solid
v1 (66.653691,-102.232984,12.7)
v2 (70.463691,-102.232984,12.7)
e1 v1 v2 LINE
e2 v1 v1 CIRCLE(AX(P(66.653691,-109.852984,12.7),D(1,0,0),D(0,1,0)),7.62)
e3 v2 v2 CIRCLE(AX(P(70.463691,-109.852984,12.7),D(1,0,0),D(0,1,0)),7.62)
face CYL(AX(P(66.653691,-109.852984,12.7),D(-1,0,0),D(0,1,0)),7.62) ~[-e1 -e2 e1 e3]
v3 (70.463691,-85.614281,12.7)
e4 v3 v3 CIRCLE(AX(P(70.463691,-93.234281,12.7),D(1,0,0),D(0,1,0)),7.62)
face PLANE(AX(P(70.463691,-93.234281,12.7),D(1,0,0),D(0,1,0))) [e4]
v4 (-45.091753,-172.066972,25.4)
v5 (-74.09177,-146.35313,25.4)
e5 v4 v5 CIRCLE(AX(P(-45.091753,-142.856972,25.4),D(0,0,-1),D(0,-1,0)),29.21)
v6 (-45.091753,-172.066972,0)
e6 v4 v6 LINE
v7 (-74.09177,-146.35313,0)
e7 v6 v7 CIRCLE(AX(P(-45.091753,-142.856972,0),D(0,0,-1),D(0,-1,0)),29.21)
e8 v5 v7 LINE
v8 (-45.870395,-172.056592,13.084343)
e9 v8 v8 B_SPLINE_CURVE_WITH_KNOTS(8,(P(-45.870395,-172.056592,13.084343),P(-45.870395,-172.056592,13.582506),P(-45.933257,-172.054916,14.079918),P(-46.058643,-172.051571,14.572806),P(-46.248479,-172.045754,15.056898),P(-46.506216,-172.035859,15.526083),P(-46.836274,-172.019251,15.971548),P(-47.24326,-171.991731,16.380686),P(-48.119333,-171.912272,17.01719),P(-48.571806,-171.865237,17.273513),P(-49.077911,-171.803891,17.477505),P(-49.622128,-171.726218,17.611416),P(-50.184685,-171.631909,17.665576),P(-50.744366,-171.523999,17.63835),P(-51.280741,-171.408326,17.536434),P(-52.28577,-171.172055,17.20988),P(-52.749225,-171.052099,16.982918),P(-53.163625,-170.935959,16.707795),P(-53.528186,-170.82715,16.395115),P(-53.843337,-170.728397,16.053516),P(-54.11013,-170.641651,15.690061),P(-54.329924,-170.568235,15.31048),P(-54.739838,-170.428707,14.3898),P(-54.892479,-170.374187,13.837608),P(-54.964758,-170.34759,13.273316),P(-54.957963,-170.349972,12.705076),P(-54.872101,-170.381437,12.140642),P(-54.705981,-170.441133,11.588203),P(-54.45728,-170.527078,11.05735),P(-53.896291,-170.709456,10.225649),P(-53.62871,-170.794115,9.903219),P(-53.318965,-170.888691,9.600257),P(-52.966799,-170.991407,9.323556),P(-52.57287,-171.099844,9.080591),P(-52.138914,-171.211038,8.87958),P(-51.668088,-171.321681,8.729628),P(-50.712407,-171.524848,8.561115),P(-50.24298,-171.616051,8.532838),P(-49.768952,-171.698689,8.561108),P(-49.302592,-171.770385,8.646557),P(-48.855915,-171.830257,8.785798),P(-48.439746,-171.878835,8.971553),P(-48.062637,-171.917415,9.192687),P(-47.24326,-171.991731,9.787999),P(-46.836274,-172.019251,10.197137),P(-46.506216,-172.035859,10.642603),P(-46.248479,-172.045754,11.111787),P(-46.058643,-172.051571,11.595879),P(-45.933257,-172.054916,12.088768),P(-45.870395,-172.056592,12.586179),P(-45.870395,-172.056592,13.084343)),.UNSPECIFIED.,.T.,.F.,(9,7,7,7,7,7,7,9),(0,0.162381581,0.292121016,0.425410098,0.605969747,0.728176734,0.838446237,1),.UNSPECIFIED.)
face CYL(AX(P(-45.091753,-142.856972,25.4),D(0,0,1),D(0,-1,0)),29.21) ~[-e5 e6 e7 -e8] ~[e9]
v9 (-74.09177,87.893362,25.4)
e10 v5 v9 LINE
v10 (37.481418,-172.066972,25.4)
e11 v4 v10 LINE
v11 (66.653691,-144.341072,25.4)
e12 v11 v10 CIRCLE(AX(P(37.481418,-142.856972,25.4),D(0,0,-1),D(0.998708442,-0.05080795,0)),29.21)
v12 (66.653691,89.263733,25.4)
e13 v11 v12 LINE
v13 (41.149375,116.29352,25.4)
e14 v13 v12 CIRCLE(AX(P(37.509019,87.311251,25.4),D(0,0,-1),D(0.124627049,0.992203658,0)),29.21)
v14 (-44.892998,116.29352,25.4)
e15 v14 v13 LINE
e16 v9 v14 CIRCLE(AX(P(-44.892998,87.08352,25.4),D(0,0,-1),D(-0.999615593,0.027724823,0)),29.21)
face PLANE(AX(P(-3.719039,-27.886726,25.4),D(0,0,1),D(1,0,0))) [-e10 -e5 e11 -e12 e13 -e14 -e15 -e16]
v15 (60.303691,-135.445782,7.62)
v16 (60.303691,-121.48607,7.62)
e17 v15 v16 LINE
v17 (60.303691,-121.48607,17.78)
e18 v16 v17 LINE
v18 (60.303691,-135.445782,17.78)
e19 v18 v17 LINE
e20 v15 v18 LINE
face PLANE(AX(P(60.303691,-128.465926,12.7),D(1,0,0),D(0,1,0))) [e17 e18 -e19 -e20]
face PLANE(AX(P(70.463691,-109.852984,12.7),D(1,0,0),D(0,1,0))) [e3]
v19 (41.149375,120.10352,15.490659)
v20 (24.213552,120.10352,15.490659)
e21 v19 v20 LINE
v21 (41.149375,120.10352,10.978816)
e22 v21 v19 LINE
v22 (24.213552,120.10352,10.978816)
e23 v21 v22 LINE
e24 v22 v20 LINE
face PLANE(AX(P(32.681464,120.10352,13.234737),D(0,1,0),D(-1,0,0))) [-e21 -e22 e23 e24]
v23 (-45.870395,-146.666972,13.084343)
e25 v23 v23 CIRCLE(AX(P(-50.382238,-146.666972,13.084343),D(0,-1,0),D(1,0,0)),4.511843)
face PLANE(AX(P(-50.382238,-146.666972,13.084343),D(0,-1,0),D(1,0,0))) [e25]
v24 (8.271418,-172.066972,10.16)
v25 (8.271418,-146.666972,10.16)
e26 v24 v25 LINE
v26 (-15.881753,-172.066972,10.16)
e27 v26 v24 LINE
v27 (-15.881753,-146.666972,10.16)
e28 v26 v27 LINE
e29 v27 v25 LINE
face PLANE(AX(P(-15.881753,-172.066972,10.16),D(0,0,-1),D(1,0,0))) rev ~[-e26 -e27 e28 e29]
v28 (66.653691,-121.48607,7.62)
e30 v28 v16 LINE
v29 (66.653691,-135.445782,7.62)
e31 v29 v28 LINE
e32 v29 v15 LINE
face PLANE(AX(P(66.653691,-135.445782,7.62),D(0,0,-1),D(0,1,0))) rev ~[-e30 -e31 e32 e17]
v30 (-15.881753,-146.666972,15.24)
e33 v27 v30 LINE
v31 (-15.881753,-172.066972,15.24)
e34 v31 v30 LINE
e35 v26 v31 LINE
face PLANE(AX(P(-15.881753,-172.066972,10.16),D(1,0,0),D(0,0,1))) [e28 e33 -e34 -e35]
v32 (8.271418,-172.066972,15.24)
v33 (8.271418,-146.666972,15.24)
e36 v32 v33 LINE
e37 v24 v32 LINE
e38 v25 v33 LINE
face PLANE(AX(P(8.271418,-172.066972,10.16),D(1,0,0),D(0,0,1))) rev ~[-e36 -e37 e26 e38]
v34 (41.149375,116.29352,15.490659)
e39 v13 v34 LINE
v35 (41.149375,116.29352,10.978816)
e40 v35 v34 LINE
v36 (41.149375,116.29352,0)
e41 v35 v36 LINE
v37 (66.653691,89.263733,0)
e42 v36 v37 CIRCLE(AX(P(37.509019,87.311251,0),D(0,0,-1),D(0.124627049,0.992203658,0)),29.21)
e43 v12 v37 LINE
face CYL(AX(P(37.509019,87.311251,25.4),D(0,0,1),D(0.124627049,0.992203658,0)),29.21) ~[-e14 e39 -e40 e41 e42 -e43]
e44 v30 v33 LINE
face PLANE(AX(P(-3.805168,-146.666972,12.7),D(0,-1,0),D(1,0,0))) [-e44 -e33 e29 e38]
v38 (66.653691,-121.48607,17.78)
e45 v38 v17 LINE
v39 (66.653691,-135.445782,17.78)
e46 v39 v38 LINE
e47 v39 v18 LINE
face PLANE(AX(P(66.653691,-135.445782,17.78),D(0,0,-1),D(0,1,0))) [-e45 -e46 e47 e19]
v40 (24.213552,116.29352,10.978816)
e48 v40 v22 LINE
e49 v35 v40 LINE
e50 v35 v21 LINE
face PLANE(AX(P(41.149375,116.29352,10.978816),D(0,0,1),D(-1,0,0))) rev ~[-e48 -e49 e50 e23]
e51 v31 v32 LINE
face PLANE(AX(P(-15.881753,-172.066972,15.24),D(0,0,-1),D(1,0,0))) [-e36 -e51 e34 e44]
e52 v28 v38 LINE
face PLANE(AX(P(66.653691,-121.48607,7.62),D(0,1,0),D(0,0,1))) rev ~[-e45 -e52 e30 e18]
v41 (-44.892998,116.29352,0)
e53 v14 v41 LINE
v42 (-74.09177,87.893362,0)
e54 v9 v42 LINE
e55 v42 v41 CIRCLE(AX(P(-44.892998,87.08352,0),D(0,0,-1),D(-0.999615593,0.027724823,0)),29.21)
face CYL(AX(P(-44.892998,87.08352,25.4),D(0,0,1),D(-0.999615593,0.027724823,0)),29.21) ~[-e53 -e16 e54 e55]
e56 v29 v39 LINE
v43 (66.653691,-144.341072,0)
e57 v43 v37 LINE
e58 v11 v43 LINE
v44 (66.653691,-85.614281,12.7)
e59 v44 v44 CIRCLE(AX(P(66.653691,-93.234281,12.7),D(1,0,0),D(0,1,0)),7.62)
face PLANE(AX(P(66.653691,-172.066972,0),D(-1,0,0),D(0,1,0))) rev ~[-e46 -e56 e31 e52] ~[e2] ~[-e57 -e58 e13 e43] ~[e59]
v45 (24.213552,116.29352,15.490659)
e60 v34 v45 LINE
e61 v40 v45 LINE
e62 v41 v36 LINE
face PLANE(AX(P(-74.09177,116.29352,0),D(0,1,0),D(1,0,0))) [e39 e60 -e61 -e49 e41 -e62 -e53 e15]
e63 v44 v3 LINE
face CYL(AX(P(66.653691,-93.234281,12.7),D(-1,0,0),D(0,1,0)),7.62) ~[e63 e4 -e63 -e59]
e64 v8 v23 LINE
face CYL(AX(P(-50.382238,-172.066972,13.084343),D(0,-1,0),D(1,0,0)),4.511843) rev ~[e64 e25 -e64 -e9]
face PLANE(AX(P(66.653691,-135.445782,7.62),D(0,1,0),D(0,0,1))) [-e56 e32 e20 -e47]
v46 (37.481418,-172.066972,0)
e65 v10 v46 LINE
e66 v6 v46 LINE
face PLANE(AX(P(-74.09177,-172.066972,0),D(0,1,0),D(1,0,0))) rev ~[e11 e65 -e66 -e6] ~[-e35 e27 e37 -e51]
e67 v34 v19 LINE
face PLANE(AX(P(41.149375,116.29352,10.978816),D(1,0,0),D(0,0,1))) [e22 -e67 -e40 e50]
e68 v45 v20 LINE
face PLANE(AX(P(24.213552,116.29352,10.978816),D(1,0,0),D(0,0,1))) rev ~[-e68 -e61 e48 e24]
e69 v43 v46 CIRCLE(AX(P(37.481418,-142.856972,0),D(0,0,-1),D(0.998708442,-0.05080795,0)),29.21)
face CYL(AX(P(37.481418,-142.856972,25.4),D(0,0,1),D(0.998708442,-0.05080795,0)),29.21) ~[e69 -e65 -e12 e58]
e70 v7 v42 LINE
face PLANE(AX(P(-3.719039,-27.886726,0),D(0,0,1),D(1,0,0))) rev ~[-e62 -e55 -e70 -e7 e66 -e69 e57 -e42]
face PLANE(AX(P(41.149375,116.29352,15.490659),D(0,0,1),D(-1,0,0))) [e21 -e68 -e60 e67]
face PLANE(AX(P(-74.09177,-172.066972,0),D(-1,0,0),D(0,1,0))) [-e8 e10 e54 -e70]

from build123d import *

# Parameters (mm, degrees)
F0_W      = 140.7454609871
F0_H      = 288.360491395
F1_DEPTH  = 25.4
F4_DEPTH  = 25.4
F6_W      = 16.9358227252
F6_H      = 4.5118425041
F7_DEPTH  = 3.81
F8_W      = 13.9597124967
F8_H      = 10.16
F9_DEPTH  = 6.35
F8_R      = 7.62
F11_DEPTH = 3.81
F5_W      = 24.153170515
F5_H      = 5.08
F12_DEPTH = 25.4
F5_R      = 4.5118428767
F13_DEPTH = 25.4


with BuildPart() as f1:
    # F0 (on Top) → F1 (new body)
    with BuildSketch(Plane.XY):
        with Locations((-3.7190392613, -27.8867259622)):
            Rectangle(F0_W, F0_H)
    extrude(amount=F1_DEPTH)

    # F2 (on face) → F4 (cut)
    with BuildSketch(Plane.XY.offset(25.4)):
        with BuildLine():
            ThreePointArc((66.6536912322, -144.3410718666), (57.604458326, -164.0297686766), (37.4814176394, -172.0669716597))
            Line((37.4814176394, -172.0669716597), (66.6536912322, -172.0669716597))
            Line((66.6536912322, -172.0669716597), (66.6536912322, -144.3410718666))
        make_face()
        with BuildLine():
            Line((-74.0917697549, -172.0669716597), (-45.0917528756, -172.0669716597))
            ThreePointArc((-45.0917528756, -172.0669716597), (-64.4708824202, -164.7127131958), (-74.0917697549, -146.3531296941))
            Line((-74.0917697549, -146.3531296941), (-74.0917697549, -172.0669716597))
        make_face()
        with BuildLine():
            ThreePointArc((41.1493752002, 116.2935197353), (58.7544153268, 107.3576281035), (66.6536912322, 89.2637330754))
            Line((66.6536912322, 89.2637330754), (66.6536912322, 116.2935197353))
            Line((66.6536912322, 116.2935197353), (41.1493752002, 116.2935197353))
        make_face()
        with BuildLine():
            Line((-74.0917697549, 116.2935197353), (-74.0917697549, 87.8933618236))
            ThreePointArc((-74.0917697549, 87.8933618236), (-65.2592523832, 108.0224737135), (-44.8929982774, 116.2935197353))
            Line((-44.8929982774, 116.2935197353), (-74.0917697549, 116.2935197353))
        make_face()
    extrude(amount=-F4_DEPTH, mode=Mode.SUBTRACT)

    # F6 (on face) → F7 (join)
    with BuildSketch(Plane(origin=(0, 116.2935197353, 0), x_dir=(-1, 0, 0), z_dir=(0, 1, 0))):
        with Locations((-32.6814638376, 13.2347373292)):
            Rectangle(F6_W, F6_H)
    extrude(amount=F7_DEPTH)

    # F8 (on face) → F9 (cut)
    with BuildSketch(Plane.YZ.offset(66.6536912322)):
        with Locations((-128.4659260378, 12.7)):
            Rectangle(F8_W, F8_H)
    extrude(amount=-F9_DEPTH, mode=Mode.SUBTRACT)

    # F8 (on face) → F11 (join)
    with BuildSketch(Plane.YZ.offset(66.6536912322)):
        with Locations((-109.8529842751, 12.7)):
            Circle(F8_R)
        with Locations((-93.2342812741, 12.7)):
            Circle(F8_R)
    extrude(amount=F11_DEPTH)

    # F5 (on face) → F12 (cut)
    with BuildSketch(Plane.XZ.offset(172.0669716597)):
        with Locations((-3.8051676181, 12.7)):
            Rectangle(F5_W, F5_H)
    extrude(amount=-F12_DEPTH, mode=Mode.SUBTRACT)

    # F5 (on face) → F13 (cut)
    with BuildSketch(Plane.XZ.offset(172.0669716597)):
        with Locations((-50.3822378814, 13.0843427032)):
            Circle(F5_R)
    extrude(amount=-F13_DEPTH, mode=Mode.SUBTRACT)


solid = f1.part
